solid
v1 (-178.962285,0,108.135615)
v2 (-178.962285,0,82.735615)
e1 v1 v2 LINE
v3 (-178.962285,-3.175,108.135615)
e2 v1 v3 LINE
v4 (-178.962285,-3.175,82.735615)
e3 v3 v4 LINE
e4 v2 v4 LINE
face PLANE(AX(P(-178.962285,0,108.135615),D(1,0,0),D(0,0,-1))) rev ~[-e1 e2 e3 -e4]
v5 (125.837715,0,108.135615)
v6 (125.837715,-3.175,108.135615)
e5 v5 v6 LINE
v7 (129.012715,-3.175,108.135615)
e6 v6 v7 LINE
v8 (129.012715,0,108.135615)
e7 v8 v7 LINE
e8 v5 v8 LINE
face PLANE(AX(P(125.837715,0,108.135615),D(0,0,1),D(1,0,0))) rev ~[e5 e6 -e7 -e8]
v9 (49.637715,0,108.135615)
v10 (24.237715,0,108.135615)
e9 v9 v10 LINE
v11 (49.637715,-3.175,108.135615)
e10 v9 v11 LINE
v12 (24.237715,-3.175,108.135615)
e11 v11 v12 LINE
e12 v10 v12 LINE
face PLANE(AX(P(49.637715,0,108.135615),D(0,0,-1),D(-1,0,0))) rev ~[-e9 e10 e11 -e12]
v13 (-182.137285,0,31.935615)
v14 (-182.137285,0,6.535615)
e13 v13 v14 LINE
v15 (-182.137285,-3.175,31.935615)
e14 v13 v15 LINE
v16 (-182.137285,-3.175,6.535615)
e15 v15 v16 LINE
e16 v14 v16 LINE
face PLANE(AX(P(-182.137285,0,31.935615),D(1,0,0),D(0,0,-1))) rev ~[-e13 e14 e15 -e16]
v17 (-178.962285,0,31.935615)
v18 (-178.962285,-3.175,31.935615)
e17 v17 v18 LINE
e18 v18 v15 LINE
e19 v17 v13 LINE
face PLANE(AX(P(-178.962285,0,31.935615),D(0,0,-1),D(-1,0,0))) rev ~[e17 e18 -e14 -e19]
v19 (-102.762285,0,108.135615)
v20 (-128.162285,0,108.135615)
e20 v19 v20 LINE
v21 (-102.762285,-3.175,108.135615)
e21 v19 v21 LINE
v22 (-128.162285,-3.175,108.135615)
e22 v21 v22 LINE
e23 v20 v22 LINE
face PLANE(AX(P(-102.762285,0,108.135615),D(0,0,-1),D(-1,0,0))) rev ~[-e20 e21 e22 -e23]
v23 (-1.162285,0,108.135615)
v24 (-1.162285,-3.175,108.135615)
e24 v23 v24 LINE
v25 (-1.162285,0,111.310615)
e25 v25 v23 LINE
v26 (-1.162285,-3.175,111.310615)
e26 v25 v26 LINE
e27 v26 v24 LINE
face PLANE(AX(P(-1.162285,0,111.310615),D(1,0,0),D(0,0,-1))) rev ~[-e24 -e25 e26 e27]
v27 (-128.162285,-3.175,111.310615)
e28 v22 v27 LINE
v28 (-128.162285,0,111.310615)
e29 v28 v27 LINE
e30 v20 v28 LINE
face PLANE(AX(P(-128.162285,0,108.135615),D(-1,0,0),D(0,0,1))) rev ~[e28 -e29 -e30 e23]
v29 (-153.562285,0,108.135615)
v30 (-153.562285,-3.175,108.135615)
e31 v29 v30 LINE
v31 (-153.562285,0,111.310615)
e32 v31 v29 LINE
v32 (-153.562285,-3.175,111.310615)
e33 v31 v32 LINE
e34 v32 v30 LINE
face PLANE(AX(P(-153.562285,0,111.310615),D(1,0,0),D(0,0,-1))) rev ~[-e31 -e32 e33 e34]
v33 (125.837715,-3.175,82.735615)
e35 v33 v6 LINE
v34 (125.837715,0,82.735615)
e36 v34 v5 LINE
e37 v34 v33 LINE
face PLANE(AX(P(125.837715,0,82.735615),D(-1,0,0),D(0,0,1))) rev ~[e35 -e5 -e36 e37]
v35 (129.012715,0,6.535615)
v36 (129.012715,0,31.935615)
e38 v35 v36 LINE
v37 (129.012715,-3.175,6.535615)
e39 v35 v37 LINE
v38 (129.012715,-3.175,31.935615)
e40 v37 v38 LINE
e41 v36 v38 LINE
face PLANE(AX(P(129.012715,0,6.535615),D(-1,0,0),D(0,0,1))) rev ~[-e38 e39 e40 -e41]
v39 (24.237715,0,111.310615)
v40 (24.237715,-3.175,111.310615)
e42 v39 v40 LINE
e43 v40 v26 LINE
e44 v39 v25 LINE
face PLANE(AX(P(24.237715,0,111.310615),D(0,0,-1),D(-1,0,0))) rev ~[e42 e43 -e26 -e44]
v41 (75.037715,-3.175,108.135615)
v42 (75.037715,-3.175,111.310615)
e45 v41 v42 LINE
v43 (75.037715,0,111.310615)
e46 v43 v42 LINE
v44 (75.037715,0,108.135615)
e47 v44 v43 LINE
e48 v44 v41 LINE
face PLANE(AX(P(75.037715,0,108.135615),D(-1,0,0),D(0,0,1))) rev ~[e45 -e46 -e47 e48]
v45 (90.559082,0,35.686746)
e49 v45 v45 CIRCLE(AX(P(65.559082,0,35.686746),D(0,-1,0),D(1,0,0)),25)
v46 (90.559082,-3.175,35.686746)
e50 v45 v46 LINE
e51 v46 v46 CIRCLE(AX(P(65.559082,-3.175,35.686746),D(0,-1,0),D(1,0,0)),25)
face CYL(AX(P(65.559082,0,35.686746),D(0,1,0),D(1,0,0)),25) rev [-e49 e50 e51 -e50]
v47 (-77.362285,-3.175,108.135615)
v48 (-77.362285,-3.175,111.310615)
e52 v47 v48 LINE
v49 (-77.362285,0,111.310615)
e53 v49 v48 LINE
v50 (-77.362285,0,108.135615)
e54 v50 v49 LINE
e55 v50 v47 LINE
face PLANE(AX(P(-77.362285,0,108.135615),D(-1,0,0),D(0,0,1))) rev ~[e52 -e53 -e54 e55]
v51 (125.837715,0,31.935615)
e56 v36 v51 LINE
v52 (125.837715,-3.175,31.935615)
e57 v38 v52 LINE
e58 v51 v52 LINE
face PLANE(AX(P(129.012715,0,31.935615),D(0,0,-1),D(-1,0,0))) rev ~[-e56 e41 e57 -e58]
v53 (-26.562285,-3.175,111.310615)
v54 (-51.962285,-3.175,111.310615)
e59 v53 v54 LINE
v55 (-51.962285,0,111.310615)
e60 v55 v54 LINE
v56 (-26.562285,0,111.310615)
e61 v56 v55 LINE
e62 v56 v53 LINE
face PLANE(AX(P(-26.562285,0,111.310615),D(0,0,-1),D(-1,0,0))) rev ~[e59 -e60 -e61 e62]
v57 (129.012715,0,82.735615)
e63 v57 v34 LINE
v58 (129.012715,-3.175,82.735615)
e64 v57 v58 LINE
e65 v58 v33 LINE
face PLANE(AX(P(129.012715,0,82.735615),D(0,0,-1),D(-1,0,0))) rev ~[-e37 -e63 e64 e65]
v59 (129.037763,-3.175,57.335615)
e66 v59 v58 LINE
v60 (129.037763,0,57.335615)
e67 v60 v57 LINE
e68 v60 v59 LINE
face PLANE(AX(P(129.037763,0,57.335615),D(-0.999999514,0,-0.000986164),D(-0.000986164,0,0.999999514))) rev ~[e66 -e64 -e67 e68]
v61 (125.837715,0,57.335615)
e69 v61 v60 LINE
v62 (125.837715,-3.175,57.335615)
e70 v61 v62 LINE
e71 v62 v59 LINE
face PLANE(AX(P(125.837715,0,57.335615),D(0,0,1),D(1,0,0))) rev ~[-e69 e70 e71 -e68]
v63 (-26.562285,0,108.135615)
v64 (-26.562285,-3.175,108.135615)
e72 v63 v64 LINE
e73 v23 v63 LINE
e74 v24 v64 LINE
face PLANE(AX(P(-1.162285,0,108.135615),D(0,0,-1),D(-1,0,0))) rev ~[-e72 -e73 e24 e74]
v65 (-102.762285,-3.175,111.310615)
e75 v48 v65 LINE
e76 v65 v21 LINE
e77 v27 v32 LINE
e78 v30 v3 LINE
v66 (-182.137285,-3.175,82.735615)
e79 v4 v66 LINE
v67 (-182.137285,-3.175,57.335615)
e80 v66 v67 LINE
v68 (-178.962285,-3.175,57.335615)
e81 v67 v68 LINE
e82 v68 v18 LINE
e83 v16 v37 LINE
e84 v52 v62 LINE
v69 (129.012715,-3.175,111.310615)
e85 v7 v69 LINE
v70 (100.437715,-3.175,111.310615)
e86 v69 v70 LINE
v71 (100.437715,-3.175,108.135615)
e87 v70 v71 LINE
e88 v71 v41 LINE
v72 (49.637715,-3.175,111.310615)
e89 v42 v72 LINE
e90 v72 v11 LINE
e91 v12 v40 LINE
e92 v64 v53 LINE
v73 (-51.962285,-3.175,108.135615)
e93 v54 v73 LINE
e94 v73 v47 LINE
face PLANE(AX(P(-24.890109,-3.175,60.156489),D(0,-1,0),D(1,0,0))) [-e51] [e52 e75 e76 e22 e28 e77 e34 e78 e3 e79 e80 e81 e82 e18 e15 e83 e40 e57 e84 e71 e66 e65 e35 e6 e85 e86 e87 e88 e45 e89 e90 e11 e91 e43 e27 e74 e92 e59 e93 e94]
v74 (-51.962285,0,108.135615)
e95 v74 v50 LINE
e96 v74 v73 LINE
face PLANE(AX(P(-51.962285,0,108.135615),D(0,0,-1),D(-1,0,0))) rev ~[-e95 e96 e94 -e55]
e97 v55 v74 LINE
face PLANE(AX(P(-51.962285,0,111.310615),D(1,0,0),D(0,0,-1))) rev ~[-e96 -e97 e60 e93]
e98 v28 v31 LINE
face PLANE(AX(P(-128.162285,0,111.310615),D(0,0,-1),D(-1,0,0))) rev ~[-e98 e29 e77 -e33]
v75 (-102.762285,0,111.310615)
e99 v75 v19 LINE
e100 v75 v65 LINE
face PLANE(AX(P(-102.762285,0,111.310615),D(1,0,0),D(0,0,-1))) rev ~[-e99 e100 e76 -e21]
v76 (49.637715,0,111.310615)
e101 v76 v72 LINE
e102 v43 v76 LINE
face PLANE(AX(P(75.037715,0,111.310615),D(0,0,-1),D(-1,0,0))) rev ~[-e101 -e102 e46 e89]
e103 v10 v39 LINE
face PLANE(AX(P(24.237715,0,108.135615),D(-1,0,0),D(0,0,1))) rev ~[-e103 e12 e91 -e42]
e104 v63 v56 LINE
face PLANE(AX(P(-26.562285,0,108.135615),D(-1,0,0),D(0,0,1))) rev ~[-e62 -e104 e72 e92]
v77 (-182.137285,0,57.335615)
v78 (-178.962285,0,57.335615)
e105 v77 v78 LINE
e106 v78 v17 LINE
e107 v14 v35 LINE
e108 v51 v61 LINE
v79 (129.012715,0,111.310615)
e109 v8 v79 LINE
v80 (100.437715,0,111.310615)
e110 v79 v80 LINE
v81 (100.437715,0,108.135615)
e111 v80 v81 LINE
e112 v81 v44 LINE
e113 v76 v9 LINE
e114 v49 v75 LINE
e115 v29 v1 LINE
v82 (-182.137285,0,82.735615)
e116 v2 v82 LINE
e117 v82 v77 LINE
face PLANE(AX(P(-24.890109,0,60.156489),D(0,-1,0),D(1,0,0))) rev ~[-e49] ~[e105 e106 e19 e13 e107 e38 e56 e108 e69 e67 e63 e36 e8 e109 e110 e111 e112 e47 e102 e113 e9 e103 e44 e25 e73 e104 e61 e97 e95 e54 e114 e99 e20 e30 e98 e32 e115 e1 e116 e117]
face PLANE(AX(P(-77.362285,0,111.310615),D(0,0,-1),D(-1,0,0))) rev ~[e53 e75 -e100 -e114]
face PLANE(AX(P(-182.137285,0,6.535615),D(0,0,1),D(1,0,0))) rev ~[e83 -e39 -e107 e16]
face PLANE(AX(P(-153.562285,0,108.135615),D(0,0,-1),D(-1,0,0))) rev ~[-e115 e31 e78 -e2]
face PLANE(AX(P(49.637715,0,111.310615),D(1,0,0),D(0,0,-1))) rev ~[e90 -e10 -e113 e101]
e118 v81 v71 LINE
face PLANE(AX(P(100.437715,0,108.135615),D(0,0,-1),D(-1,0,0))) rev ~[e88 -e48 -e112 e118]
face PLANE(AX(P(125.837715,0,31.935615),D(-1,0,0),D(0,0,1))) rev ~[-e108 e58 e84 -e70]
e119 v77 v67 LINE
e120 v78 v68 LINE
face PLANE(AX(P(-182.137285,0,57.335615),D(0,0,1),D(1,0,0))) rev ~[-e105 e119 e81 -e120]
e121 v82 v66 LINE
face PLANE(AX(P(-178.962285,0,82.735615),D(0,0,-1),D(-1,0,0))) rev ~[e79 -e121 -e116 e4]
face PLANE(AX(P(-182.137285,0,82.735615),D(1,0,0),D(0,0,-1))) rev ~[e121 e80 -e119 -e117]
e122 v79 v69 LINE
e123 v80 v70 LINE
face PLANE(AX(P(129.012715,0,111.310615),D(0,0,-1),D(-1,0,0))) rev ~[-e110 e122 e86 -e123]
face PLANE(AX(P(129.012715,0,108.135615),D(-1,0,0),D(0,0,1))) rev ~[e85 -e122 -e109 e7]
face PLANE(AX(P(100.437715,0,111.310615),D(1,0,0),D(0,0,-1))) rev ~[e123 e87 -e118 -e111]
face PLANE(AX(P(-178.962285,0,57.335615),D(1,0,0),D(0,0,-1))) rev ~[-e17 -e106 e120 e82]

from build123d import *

# Parameters (mm, degrees)
F0_R     = 25
F1_DEPTH = 3.175


# Not quite as in the source:
# - a length typed as a fraction of an inch, garbled in the dataset ("3 / 203.2 mm" for 3/8 in), is restored


with BuildPart() as f1:
    # F0 (on Front) → F1 (new body)
    with BuildSketch(Plane.XZ):
        Polygon((-182.1372853069, 6.5356151886), (-178.9622853069, 6.5356151886), (125.8377146931, 6.5356151886), (129.0127146931, 6.5356151886), (129.0127146931, 31.9356151886), (125.8377146931, 31.9356151886), (125.8377146931, 57.3356151886), (129.0377632678, 57.3356151886), (129.0127146931, 82.7356151886), (125.8377146931, 82.7356151886), (125.8377146931, 108.1356151886), (129.0127146931, 108.1356151886), (129.0127146931, 111.3106151886), (125.8377146931, 111.3106151886), (100.4377146931, 111.3106151886), (100.4377146931, 108.1356151886), (75.0377146931, 108.1356151886), (75.0377146931, 111.3106151886), (49.6377146931, 111.3106151886), (49.6377146931, 108.1356151886), (24.2377146931, 108.1356151886), (24.2377146931, 111.3106151886), (-1.1622853069, 111.3106151886), (-1.1622853069, 108.1356151886), (-26.5622853069, 108.1356151886), (-26.5622853069, 111.3106151886), (-51.9622853069, 111.3106151886), (-51.9622853069, 108.1356151886), (-77.3622853069, 108.1356151886), (-77.3622853069, 111.3106151886), (-102.7622853069, 111.3106151886), (-102.7622853069, 108.1356151886), (-128.1622853069, 108.1356151886), (-128.1622853069, 111.3106151886), (-153.5622853069, 111.3106151886), (-153.5622853069, 108.1356151886), (-178.9622853069, 108.1356151886), (-178.9622853069, 82.7356151886), (-182.1372853069, 82.7356151886), (-182.1372853069, 57.3356151886), (-178.9622853069, 57.3356151886), (-178.9622853069, 31.9356151886), (-182.1372853069, 31.9356151886), align=None)
        with Locations((65.5590817332, 35.6867462397)):
            Circle(F0_R, mode=Mode.SUBTRACT)
    extrude(amount=F1_DEPTH)


solid = f1.part
